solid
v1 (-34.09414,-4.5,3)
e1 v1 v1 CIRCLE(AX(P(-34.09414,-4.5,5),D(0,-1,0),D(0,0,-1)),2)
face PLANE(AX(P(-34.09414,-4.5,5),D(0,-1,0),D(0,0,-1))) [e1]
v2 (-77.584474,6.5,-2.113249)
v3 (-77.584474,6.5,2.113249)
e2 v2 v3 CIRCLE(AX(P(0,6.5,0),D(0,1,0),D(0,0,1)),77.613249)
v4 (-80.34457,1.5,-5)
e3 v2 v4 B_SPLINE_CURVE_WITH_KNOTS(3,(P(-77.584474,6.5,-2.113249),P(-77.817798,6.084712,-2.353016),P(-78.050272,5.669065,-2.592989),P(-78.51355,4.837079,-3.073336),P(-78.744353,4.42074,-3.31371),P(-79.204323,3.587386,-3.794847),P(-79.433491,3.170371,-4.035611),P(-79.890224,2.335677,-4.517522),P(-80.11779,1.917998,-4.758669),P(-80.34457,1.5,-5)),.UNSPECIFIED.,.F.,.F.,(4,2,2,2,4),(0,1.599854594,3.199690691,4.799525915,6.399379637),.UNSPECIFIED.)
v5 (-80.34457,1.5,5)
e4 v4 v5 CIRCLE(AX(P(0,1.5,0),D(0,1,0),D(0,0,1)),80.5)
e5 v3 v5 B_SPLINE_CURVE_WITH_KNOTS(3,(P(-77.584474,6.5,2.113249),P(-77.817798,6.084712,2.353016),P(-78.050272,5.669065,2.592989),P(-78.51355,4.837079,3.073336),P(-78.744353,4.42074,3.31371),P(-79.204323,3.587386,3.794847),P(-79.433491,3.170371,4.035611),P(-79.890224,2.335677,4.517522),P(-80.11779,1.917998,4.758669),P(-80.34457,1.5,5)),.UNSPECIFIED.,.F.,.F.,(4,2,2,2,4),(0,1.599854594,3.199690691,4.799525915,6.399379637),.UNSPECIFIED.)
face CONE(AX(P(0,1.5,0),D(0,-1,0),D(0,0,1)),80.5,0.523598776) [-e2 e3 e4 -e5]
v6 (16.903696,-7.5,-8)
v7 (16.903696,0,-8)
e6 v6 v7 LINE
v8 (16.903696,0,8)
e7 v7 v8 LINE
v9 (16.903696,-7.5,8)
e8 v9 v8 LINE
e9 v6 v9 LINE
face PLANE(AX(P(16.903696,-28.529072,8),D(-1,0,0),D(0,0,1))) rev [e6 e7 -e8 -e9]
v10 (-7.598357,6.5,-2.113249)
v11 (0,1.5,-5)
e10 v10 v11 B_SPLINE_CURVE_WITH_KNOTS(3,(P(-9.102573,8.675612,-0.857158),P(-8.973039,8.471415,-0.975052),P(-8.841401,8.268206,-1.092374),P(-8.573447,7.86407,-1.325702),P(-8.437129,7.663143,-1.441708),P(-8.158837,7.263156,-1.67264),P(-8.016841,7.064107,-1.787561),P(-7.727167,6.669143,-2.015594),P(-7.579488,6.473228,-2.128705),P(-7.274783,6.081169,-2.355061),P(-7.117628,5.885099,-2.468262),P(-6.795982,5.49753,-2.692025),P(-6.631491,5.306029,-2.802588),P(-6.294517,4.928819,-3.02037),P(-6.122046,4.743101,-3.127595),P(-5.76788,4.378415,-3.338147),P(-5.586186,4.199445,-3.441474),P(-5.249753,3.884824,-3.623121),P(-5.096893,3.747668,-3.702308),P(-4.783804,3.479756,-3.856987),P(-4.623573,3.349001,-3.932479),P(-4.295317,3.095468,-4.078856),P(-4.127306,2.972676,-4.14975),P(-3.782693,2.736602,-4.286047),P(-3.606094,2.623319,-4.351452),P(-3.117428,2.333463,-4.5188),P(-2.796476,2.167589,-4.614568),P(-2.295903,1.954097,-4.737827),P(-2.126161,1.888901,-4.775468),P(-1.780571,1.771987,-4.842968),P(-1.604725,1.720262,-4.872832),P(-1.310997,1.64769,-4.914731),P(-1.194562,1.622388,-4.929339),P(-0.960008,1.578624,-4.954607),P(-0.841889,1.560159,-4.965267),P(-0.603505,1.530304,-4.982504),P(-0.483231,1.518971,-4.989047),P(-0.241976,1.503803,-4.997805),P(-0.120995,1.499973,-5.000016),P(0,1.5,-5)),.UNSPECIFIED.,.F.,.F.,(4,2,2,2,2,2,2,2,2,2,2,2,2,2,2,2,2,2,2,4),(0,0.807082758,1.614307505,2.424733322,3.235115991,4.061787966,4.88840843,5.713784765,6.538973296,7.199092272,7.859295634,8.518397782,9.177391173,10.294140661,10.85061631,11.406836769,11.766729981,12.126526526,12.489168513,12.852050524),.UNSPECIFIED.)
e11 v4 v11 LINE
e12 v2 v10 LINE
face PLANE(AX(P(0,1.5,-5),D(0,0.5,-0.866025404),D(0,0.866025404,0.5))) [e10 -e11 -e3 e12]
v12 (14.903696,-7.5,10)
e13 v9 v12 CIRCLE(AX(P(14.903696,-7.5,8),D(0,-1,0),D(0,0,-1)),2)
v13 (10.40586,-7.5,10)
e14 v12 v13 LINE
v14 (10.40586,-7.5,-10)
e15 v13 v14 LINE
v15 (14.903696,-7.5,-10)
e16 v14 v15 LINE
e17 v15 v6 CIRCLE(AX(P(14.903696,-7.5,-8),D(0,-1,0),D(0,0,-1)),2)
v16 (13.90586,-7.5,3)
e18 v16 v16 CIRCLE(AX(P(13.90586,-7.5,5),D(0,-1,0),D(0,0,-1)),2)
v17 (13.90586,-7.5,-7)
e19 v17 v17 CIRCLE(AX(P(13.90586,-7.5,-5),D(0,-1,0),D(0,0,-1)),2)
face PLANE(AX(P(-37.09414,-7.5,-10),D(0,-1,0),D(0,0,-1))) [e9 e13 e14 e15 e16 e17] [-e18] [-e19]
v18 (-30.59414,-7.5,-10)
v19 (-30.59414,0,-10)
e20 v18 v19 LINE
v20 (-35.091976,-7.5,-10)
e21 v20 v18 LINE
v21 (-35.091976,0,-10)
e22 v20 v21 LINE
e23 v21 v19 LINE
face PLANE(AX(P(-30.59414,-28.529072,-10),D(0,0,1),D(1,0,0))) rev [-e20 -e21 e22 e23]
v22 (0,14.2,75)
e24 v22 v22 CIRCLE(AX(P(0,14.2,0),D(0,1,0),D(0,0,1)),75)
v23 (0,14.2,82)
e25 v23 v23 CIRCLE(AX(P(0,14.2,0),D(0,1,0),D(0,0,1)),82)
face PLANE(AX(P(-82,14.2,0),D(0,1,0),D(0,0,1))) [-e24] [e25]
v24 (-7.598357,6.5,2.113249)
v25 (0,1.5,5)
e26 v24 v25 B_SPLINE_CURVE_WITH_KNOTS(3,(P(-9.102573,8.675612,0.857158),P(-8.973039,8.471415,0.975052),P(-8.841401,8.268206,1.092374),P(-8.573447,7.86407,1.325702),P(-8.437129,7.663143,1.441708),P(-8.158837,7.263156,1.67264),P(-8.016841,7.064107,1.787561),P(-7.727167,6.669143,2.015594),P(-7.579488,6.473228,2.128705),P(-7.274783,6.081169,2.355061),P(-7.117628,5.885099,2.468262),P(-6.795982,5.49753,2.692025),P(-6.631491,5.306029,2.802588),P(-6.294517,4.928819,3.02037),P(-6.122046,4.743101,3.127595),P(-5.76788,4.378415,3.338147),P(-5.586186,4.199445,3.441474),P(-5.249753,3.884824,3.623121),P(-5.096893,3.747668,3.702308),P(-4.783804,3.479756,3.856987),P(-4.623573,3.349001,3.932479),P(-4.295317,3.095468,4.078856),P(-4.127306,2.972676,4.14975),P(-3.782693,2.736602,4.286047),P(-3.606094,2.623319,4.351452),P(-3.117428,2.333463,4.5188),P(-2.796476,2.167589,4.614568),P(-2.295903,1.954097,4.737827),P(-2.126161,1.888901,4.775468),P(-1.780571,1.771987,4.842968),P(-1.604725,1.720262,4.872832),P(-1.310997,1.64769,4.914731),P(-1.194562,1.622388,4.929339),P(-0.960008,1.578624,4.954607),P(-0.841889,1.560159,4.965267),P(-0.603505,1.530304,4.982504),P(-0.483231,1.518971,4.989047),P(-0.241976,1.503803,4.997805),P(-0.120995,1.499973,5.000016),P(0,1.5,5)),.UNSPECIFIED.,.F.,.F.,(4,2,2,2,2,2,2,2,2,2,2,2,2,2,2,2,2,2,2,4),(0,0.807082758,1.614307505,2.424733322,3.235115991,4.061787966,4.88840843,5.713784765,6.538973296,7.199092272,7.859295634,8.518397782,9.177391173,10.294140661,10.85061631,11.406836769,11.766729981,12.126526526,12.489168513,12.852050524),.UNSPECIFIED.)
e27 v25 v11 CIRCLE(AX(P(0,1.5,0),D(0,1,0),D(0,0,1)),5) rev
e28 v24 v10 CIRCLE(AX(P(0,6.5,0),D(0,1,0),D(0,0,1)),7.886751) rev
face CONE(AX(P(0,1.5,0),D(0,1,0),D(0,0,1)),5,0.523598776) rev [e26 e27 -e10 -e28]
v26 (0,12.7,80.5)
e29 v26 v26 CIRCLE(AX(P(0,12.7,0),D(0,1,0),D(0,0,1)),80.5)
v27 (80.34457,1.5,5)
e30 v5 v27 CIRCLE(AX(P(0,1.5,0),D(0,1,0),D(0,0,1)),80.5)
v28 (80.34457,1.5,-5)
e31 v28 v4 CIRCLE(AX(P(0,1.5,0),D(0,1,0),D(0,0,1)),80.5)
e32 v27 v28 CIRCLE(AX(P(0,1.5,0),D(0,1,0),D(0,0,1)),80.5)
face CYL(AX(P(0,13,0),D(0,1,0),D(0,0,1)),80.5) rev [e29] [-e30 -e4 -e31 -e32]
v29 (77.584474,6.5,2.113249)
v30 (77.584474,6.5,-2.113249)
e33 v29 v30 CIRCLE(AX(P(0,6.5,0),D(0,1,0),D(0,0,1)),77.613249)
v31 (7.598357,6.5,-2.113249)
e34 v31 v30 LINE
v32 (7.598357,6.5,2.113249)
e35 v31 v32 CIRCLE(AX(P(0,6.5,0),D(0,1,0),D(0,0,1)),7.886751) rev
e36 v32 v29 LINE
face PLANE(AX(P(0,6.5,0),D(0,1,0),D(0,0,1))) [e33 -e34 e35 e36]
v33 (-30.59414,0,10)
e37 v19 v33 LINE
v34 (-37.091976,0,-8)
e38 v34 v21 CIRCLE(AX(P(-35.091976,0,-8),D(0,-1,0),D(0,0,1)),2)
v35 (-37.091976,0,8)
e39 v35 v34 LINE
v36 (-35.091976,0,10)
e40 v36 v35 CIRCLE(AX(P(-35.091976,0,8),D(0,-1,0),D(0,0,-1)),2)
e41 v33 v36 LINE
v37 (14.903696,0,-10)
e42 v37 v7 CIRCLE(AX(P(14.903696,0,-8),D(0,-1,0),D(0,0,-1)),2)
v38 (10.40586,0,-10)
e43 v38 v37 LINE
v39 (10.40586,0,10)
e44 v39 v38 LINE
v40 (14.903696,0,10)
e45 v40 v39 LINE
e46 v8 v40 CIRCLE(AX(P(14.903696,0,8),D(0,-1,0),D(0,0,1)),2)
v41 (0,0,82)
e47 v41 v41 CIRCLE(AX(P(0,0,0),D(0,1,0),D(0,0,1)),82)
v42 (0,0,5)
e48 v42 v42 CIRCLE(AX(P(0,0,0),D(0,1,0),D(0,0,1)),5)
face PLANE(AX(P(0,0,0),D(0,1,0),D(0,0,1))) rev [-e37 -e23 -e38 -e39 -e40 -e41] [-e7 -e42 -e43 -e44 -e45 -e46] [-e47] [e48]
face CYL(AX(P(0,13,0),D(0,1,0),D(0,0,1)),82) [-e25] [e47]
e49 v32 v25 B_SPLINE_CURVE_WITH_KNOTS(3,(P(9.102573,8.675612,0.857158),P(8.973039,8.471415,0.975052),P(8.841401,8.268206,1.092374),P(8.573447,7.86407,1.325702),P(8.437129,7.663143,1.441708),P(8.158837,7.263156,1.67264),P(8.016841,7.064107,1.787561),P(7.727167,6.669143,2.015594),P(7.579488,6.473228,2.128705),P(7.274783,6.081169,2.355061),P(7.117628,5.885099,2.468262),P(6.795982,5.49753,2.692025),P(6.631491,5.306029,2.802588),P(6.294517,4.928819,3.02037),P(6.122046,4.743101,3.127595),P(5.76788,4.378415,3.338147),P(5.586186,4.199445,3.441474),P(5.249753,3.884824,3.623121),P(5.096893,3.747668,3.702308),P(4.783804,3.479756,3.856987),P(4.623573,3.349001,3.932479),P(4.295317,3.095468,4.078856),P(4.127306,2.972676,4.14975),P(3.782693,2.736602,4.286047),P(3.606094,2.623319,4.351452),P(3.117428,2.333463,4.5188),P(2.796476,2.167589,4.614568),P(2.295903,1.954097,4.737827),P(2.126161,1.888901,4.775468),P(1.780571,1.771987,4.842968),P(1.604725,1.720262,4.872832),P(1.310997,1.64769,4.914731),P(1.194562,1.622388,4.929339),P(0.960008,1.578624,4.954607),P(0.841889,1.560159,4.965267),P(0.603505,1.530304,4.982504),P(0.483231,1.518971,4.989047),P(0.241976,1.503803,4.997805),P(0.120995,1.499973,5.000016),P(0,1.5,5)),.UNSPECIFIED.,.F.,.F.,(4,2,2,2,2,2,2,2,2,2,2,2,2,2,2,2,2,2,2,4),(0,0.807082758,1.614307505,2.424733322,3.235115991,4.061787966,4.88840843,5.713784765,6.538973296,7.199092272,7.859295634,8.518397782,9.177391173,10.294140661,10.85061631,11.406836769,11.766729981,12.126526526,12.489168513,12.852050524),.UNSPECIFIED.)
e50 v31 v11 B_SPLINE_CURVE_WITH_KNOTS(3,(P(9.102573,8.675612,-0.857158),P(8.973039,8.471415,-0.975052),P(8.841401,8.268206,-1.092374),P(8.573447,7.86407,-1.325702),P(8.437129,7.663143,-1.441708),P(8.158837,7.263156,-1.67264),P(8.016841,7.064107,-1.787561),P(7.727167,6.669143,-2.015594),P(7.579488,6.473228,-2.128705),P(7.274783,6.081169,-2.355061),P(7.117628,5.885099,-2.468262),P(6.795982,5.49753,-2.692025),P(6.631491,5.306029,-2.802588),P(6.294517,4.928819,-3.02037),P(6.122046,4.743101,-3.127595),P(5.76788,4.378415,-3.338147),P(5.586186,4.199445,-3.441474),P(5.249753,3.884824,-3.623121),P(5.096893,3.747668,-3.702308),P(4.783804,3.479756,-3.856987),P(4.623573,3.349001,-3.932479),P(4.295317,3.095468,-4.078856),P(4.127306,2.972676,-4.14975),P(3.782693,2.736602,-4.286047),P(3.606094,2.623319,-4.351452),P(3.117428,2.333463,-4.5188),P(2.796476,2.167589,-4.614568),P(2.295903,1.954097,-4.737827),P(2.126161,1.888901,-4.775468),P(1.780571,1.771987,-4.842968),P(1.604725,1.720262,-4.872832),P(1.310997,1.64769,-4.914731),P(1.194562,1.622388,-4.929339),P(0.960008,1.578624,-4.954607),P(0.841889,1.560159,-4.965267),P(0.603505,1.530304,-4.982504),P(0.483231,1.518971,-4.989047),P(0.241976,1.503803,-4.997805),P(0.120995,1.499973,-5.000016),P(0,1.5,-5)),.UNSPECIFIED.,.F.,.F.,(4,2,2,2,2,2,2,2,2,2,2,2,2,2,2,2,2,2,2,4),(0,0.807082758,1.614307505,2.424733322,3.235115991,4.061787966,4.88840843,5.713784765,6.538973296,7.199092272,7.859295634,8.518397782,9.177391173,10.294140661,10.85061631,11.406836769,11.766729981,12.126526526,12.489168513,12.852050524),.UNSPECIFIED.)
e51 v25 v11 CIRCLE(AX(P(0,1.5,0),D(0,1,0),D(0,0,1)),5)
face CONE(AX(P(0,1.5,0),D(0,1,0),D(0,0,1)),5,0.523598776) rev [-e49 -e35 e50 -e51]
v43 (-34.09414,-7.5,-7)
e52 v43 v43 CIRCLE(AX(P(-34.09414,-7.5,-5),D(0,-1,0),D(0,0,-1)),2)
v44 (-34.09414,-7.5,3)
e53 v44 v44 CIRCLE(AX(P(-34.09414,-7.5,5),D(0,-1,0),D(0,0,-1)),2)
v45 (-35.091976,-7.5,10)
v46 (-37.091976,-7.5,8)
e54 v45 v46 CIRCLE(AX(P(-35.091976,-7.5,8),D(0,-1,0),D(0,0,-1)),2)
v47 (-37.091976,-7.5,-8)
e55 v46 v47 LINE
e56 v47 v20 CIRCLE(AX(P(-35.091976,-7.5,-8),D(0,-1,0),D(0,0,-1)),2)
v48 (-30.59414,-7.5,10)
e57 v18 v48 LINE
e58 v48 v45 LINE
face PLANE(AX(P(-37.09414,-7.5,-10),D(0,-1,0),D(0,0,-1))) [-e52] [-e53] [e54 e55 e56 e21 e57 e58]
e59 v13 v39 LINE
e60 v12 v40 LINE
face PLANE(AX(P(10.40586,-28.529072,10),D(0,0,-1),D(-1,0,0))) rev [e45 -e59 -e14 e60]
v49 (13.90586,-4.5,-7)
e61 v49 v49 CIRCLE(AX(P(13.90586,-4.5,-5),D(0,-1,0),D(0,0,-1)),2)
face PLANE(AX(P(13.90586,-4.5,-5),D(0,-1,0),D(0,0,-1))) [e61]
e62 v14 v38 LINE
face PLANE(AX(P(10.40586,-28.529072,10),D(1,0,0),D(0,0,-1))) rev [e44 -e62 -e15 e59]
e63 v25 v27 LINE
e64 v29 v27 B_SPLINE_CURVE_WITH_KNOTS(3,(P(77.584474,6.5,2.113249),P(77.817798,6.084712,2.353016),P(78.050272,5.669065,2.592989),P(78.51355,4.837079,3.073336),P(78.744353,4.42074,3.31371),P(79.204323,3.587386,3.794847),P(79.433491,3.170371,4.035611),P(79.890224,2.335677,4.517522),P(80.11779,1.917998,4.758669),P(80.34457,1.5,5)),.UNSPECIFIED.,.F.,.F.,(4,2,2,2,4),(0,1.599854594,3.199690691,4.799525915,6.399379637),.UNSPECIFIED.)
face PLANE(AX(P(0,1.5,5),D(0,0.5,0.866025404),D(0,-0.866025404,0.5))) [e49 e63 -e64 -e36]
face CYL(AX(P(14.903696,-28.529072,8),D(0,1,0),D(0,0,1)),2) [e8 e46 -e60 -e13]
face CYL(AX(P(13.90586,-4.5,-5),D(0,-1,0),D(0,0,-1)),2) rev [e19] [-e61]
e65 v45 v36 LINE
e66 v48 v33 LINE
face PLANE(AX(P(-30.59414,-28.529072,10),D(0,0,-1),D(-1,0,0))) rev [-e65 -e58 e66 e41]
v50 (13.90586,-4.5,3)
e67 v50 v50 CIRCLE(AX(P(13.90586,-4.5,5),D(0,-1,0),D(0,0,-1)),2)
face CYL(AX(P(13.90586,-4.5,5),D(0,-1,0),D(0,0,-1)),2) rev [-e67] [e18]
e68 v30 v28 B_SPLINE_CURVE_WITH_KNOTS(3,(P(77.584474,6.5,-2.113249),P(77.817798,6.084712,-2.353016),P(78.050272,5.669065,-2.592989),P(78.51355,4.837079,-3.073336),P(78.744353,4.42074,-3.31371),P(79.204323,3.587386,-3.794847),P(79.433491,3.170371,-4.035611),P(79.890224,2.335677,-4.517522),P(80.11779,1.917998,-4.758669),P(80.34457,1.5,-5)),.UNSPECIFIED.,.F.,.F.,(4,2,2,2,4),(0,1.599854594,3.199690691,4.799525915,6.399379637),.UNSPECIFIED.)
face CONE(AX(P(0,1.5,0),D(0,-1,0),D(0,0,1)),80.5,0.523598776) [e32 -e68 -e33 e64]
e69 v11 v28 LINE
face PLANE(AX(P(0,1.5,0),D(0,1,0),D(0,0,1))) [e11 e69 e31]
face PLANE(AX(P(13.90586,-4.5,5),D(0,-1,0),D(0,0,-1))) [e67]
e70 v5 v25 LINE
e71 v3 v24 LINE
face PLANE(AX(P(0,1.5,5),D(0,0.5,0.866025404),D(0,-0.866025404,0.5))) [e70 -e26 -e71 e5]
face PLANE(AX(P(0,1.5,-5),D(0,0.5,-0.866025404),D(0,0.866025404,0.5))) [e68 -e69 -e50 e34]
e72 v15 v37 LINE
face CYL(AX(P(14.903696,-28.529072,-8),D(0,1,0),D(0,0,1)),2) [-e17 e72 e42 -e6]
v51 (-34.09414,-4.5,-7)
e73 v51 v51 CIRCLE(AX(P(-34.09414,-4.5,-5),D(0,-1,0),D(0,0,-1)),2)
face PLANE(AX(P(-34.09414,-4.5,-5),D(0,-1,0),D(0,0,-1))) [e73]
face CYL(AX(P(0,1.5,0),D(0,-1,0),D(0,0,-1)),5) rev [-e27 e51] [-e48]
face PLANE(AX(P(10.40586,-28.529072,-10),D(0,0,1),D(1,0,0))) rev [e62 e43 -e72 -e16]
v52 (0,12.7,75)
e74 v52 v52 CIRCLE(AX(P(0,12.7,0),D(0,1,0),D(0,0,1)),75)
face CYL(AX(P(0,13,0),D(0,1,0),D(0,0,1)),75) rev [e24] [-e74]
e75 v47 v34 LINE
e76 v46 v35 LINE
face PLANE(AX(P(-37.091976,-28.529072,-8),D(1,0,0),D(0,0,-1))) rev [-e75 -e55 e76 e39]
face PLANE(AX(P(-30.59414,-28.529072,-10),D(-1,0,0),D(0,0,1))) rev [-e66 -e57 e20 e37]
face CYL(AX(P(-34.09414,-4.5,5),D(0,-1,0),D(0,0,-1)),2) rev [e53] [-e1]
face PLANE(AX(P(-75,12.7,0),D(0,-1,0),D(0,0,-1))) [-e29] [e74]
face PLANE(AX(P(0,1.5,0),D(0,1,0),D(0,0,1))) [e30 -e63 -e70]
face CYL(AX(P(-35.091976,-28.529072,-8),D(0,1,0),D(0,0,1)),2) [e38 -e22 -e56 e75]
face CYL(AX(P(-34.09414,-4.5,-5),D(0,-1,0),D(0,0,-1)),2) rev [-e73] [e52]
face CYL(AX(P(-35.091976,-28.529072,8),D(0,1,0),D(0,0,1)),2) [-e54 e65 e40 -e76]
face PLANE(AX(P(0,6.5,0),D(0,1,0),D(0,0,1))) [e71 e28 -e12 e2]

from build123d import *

# Parameters (mm, degrees)
SKETCH2_R             = 80.5
SKETCH2_R_2           = 5
BOSS_EXTRUDE1_DEPTH   = 1.5
BOSS_EXTRUDE3_DEPTH   = 5
BOSS_EXTRUDE3_DRAFT   = 30
BOSS_EXTRUDE3_2_DEPTH = 5
BOSS_EXTRUDE3_2_DRAFT = 30
BOSS_EXTRUDE4_DEPTH   = 7.5
SKETCH8_R             = 2
CUT_EXTRUDE1_DEPTH    = 3


# Read off the part's stored shape, not the designer's step: Boss-Extrude3
with BuildPart() as part:
    # Sketch2 → Boss-Extrude1 (new body)
    with BuildSketch(Plane(origin=(0, 0, 0), x_dir=(1, 0, 0), z_dir=(0, 1, 0))):
        with Locations(Location((0, 0, 0), (0, 0, 270))):
            Circle(SKETCH2_R)
        with Locations(Location((0, 0, 0), (0, 0, 270))):
            Circle(SKETCH2_R_2, mode=Mode.SUBTRACT)
    extrude(amount=BOSS_EXTRUDE1_DEPTH)


with BuildPart() as boss_extrude3_tool:
    # Boss-Extrude3 outline → Boss-Extrude3 (with draft: the straight prism first)
    with BuildSketch(Plane(origin=(0, 6.5, 0), x_dir=(1, 0, 0), z_dir=(0, 1, 0))):
        with BuildLine():
            Line((-7.598356857, 2.113248654), (-77.584473619, 2.113248654))
            ThreePointArc((-77.584473619, 2.113248654), (-77.613248654, 0), (-77.584473619, -2.113248654))
            Line((-77.584473619, -2.113248654), (-7.598356857, -2.113248654))
            ThreePointArc((-7.598356857, -2.113248654), (-7.886751346, 0), (-7.598356857, 2.113248654))
        make_face()
    extrude(amount=-BOSS_EXTRUDE3_DEPTH)
    # Boss-Extrude3: the draft: its side faces are tilted about the plane it starts from
    boss_extrude3_sides = [boss_extrude3_tool.faces().sort_by_distance(p)[0] for p in [
        (-42.591415238, 4, -2.113248654),
        (-77.613248654, 4, 0),
        (-42.591415238, 4, 2.113248654),
        (-7.886751346, 4, 0),
    ]]
    draft(boss_extrude3_sides, Plane(origin=(0, 6.5, 0), x_dir=(1, 0, 0), z_dir=(0, 1, 0)), BOSS_EXTRUDE3_DRAFT)


with BuildPart() as part_1:
    add(part.part)

    # Boss-Extrude3: add boss_extrude3_tool
    add(boss_extrude3_tool.part)


with BuildPart() as boss_extrude3_2_tool:
    # Boss-Extrude3 2 outline → Boss-Extrude3 2 (with draft: the straight prism first)
    with BuildSketch(Plane(origin=(0, 6.5, 0), x_dir=(1, 0, 0), z_dir=(0, 1, 0))):
        with BuildLine():
            Line((77.584473619, 2.113248654), (7.598356857, 2.113248654))
            ThreePointArc((7.598356857, 2.113248654), (7.886751346, 0), (7.598356857, -2.113248654))
            Line((7.598356857, -2.113248654), (77.584473619, -2.113248654))
            ThreePointArc((77.584473619, -2.113248654), (77.613248654, 0), (77.584473619, 2.113248654))
        make_face()
    extrude(amount=-BOSS_EXTRUDE3_2_DEPTH)
    # Boss-Extrude3 2: the draft: its side faces are tilted about the plane it starts from
    boss_extrude3_2_sides = [boss_extrude3_2_tool.faces().sort_by_distance(p)[0] for p in [
        (42.591415238, 4, 2.113248654),
        (77.613248654, 4, 0),
        (42.591415238, 4, -2.113248654),
        (7.886751346, 4, 0),
    ]]
    draft(boss_extrude3_2_sides, Plane(origin=(0, 6.5, 0), x_dir=(1, 0, 0), z_dir=(0, 1, 0)), BOSS_EXTRUDE3_2_DRAFT)


with BuildPart() as part_2:
    add(part_1.part)

    # Boss-Extrude3 2: add boss_extrude3_2_tool
    add(boss_extrude3_2_tool.part)

    # Sketch6 → Revolve1 (revolve)
    with BuildSketch(Plane.XY, mode=Mode.PRIVATE) as revolve1_sk:
        Polygon((-80.5, 0), (-82, 0), (-82, 14.2), (-75, 14.2), (-75, 12.7), (-80.5, 12.7), align=None)
    revolve(revolve1_sk.sketch.rotate(Axis((0, 13, 0), (0, -1, 0)), 270), axis=Axis((0, 13, 0), (0, -1, 0)))

    # Sketch7 → Boss-Extrude4 (add)
    with BuildSketch(Plane.XZ):
        with BuildLine():
            Line((10.405859981, 10), (14.903696288, 10))
            ThreePointArc((14.903696288, 10), (16.317909851, 9.414213562), (16.903696288, 8))
            Line((16.903696288, 8), (16.903696288, -8))
            ThreePointArc((16.903696288, -8), (16.317909851, -9.414213562), (14.903696288, -10))
            Line((14.903696288, -10), (10.405859981, -10))
            Line((10.405859981, -10), (10.405859981, 10))
        make_face()
        with BuildLine():
            Line((-30.594140019, -10), (-35.091976326, -10))
            ThreePointArc((-35.091976326, -10), (-36.506189888, -9.414213562), (-37.091976326, -8))
            Line((-37.091976326, -8), (-37.091976326, 8))
            ThreePointArc((-37.091976326, 8), (-36.506189888, 9.414213562), (-35.091976326, 10))
            Line((-35.091976326, 10), (-30.594140019, 10))
            Line((-30.594140019, 10), (-30.594140019, -10))
        make_face()
    extrude(amount=BOSS_EXTRUDE4_DEPTH)

    # Sketch8 → Cut-Extrude1 (cut)
    with BuildSketch(Plane.XZ.offset(7.5)):
        with Locations(Location((13.905859981, -5, 0), (0, 0, 270))):
            Circle(SKETCH8_R)
        with Locations(Location((13.905859981, 5, 0), (0, 0, 270))):
            Circle(SKETCH8_R)
        with Locations(Location((-34.094140019, -5, 0), (0, 0, 270))):
            Circle(SKETCH8_R)
        with Locations(Location((-34.094140019, 5, 0), (0, 0, 270))):
            Circle(SKETCH8_R)
    extrude(amount=-CUT_EXTRUDE1_DEPTH, mode=Mode.SUBTRACT)


solid = part_2.part
